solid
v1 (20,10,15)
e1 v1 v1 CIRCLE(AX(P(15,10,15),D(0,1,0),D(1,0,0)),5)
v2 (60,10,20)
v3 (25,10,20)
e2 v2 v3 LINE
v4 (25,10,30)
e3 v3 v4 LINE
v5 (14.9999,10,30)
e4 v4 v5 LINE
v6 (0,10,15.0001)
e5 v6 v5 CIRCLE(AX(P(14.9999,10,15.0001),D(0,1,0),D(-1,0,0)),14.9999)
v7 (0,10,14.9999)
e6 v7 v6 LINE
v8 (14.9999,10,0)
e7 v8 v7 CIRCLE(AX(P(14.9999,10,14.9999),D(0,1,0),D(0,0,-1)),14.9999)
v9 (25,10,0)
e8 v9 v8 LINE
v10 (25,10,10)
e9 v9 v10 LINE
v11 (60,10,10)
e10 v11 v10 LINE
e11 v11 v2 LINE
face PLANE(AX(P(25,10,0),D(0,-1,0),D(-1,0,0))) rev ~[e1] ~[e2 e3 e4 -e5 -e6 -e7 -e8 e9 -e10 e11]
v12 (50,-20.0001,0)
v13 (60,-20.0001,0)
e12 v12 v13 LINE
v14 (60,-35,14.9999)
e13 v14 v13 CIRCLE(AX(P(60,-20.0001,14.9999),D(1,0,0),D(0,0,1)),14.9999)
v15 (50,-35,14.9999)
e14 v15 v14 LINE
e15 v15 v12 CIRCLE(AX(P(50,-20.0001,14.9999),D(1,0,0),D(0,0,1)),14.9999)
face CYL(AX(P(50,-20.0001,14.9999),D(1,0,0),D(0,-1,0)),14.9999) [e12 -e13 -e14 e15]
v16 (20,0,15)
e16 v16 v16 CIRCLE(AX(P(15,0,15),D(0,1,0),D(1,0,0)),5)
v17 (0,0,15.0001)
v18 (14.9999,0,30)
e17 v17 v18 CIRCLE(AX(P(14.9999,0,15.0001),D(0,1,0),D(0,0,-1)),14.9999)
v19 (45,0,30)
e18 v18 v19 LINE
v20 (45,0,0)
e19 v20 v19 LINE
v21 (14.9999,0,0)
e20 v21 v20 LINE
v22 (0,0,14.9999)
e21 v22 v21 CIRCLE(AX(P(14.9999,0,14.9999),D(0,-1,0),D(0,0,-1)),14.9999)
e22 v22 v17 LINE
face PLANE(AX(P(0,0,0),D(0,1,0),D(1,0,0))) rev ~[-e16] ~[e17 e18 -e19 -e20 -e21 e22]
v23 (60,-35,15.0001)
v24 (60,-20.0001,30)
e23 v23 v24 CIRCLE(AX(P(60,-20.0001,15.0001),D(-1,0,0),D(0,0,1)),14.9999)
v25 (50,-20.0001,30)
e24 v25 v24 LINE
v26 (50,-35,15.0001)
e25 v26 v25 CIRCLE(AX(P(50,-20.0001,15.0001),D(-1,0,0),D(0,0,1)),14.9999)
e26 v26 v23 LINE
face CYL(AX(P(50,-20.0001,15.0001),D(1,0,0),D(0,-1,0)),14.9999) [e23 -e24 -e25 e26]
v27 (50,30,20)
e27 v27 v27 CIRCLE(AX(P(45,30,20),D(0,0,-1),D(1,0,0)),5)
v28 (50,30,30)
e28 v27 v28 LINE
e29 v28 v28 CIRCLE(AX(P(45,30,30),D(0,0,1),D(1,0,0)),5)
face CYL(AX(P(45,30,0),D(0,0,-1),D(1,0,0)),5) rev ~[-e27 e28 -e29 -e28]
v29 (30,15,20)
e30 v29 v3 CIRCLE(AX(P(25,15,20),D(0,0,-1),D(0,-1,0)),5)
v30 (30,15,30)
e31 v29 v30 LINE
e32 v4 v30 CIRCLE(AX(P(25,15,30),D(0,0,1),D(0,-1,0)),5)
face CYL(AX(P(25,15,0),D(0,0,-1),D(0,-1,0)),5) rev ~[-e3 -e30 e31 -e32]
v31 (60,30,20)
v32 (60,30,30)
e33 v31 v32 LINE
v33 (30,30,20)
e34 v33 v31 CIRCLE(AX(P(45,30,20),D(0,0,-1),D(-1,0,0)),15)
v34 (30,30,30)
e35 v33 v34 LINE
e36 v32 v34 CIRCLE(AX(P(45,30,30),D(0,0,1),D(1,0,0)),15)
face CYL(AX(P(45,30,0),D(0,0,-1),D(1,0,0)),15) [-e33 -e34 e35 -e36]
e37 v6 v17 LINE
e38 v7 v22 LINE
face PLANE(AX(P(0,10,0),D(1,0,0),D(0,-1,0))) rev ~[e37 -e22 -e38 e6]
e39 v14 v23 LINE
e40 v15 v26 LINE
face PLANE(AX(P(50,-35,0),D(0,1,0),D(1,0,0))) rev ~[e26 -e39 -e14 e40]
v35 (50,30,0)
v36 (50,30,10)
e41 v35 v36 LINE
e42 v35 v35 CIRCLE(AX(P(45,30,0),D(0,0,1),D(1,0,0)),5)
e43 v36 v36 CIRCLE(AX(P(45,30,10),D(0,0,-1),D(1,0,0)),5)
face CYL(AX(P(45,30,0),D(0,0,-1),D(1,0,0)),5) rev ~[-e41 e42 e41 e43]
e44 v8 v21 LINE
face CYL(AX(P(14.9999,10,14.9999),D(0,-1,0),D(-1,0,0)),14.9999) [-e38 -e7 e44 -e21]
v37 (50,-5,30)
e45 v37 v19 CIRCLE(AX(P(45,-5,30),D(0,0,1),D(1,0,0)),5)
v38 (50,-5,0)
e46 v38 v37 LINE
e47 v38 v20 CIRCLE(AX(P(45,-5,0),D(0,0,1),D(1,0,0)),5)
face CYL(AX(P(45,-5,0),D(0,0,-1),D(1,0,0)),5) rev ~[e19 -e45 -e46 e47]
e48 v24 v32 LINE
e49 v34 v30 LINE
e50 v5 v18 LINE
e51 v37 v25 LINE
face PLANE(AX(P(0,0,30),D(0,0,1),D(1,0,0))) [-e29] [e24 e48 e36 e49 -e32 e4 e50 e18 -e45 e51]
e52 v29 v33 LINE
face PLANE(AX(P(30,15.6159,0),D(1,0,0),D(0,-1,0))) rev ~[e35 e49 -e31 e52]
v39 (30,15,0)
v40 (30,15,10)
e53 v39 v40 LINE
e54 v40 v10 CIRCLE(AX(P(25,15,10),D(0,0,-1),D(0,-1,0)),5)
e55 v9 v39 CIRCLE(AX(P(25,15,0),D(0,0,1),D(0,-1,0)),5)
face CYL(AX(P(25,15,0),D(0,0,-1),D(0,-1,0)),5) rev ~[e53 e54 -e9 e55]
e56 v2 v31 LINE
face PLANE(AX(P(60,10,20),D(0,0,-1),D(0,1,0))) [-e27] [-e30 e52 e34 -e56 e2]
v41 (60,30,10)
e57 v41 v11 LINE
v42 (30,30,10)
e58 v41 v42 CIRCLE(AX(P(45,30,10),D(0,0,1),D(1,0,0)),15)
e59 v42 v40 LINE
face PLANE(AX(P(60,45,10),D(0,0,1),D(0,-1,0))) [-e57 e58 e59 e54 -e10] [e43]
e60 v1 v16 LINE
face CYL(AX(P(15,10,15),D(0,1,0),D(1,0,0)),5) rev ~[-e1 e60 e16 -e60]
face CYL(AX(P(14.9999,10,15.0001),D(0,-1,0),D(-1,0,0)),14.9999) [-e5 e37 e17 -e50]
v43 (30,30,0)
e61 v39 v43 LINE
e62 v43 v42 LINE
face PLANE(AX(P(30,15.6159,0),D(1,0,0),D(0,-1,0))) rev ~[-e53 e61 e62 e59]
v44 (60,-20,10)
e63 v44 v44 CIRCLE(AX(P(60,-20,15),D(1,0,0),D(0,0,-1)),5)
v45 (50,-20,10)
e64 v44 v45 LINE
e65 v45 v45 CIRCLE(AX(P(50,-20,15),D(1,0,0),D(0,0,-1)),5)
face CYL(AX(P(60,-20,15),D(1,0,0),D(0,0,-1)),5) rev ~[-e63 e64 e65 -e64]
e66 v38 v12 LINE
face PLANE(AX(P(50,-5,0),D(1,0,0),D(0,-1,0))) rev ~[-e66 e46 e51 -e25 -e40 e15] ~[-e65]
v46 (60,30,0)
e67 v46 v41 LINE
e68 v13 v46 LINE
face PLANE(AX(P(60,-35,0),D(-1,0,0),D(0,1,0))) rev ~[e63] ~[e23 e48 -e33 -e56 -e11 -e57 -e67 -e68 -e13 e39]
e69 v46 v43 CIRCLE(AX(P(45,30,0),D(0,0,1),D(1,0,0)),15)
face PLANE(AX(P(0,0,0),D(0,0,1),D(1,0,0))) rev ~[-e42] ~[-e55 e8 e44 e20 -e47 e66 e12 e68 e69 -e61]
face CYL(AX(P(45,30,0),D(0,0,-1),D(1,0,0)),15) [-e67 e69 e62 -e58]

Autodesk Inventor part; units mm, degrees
ref_plane "YZ Plane" through (0, 0, 0) normal (1, 0, 0) x (0, 1, 0)
ref_plane "XZ Plane" through (0, 0, 0) normal (0, 1, 0) x (-1, 0, 0)
ref_plane "XY Plane" through (0, 0, 0) normal (0, 0, 1) x (1, 0, 0)
sketch "Sketch1" plane through (0, 0, 0) normal (0, 0, 1) x (1, 0, 0)
  line L0 (0, 0) -> (45, 0)
  line L1 (50, -5) -> (50, -35)
  line L2 (50, -35) -> (60, -35)
  line L3 (60, -35) -> (60, 30)
  arc A0 (60, 30) -> (30, 30) centre (45, 30) ccw
  line L4 (30, 30) -> (30, 15.6159)
  line L5 (30, 15.6159) -> (30, 15)
  arc A1 (25, 10) -> (30, 15) centre (25, 15) ccw
  line L6 (25, 10) -> (0, 10)
  line L7 (0, 10) -> (0, 0)
  arc A2 (50, -5) -> (45, 0) centre (45, -5) ccw
  circle A3 centre (45, 30) radius 5
  dimension "d0" = 5
  dimension "d1" = 10
  dimension "d2" = 30
  dimension "d3" = 10
  dimension "d4" = 10
  dimension "d5" = 60
  dimension "d6" = 35
  dimension "d7" = 65
extrude "Extrusion1" add sketch "Sketch1" along normal blind 30
fillet "Fillet1" radius 15 4 edges at (0, 5, 30) (0, 5, 0) (55, -35, 30) (55, -35, 0)
sketch "Sketch2" plane through (60, 30, 30) normal (1, 0, 0) x (0, 0, -1)
  arc A0 (0, -50) -> (30, -50) centre (15, -50) ccw projected
  circle A1 centre (15, -50) radius 5
  line L0 (20, 15) -> (20, -20)
  line L1 (20, -20) -> (10, -20)
  line L2 (10, -20) -> (10, 15)
  line L3 (30, 15) -> (0, 15) projected
  line L4 (30, 15) -> (30, 0) projected
  line L5 (30, -20) -> (0, -20) projected
  point P0 (30, -30)
  point P1 (15, -20)
  point P2 (15, 15)
  point P3 (20, 15)
  dimension "d11" = 10
  dimension "d12" = 10
extrude "Extrusion2" cut sketch "Sketch2" against normal through all
sketch "Sketch3" plane through (15, 10, 0) normal (0, 1, 0) x (1, 0, 0)
  arc A0 (0, 0) -> (0, -30) centre (0, -15) ccw projected
  circle A1 centre (0, -15) radius 5
  point P0 (-15, 0)
  dimension "d15" = 10
extrude "Extrusion3" cut sketch "Sketch3" against normal through all
properties part number "b5"
